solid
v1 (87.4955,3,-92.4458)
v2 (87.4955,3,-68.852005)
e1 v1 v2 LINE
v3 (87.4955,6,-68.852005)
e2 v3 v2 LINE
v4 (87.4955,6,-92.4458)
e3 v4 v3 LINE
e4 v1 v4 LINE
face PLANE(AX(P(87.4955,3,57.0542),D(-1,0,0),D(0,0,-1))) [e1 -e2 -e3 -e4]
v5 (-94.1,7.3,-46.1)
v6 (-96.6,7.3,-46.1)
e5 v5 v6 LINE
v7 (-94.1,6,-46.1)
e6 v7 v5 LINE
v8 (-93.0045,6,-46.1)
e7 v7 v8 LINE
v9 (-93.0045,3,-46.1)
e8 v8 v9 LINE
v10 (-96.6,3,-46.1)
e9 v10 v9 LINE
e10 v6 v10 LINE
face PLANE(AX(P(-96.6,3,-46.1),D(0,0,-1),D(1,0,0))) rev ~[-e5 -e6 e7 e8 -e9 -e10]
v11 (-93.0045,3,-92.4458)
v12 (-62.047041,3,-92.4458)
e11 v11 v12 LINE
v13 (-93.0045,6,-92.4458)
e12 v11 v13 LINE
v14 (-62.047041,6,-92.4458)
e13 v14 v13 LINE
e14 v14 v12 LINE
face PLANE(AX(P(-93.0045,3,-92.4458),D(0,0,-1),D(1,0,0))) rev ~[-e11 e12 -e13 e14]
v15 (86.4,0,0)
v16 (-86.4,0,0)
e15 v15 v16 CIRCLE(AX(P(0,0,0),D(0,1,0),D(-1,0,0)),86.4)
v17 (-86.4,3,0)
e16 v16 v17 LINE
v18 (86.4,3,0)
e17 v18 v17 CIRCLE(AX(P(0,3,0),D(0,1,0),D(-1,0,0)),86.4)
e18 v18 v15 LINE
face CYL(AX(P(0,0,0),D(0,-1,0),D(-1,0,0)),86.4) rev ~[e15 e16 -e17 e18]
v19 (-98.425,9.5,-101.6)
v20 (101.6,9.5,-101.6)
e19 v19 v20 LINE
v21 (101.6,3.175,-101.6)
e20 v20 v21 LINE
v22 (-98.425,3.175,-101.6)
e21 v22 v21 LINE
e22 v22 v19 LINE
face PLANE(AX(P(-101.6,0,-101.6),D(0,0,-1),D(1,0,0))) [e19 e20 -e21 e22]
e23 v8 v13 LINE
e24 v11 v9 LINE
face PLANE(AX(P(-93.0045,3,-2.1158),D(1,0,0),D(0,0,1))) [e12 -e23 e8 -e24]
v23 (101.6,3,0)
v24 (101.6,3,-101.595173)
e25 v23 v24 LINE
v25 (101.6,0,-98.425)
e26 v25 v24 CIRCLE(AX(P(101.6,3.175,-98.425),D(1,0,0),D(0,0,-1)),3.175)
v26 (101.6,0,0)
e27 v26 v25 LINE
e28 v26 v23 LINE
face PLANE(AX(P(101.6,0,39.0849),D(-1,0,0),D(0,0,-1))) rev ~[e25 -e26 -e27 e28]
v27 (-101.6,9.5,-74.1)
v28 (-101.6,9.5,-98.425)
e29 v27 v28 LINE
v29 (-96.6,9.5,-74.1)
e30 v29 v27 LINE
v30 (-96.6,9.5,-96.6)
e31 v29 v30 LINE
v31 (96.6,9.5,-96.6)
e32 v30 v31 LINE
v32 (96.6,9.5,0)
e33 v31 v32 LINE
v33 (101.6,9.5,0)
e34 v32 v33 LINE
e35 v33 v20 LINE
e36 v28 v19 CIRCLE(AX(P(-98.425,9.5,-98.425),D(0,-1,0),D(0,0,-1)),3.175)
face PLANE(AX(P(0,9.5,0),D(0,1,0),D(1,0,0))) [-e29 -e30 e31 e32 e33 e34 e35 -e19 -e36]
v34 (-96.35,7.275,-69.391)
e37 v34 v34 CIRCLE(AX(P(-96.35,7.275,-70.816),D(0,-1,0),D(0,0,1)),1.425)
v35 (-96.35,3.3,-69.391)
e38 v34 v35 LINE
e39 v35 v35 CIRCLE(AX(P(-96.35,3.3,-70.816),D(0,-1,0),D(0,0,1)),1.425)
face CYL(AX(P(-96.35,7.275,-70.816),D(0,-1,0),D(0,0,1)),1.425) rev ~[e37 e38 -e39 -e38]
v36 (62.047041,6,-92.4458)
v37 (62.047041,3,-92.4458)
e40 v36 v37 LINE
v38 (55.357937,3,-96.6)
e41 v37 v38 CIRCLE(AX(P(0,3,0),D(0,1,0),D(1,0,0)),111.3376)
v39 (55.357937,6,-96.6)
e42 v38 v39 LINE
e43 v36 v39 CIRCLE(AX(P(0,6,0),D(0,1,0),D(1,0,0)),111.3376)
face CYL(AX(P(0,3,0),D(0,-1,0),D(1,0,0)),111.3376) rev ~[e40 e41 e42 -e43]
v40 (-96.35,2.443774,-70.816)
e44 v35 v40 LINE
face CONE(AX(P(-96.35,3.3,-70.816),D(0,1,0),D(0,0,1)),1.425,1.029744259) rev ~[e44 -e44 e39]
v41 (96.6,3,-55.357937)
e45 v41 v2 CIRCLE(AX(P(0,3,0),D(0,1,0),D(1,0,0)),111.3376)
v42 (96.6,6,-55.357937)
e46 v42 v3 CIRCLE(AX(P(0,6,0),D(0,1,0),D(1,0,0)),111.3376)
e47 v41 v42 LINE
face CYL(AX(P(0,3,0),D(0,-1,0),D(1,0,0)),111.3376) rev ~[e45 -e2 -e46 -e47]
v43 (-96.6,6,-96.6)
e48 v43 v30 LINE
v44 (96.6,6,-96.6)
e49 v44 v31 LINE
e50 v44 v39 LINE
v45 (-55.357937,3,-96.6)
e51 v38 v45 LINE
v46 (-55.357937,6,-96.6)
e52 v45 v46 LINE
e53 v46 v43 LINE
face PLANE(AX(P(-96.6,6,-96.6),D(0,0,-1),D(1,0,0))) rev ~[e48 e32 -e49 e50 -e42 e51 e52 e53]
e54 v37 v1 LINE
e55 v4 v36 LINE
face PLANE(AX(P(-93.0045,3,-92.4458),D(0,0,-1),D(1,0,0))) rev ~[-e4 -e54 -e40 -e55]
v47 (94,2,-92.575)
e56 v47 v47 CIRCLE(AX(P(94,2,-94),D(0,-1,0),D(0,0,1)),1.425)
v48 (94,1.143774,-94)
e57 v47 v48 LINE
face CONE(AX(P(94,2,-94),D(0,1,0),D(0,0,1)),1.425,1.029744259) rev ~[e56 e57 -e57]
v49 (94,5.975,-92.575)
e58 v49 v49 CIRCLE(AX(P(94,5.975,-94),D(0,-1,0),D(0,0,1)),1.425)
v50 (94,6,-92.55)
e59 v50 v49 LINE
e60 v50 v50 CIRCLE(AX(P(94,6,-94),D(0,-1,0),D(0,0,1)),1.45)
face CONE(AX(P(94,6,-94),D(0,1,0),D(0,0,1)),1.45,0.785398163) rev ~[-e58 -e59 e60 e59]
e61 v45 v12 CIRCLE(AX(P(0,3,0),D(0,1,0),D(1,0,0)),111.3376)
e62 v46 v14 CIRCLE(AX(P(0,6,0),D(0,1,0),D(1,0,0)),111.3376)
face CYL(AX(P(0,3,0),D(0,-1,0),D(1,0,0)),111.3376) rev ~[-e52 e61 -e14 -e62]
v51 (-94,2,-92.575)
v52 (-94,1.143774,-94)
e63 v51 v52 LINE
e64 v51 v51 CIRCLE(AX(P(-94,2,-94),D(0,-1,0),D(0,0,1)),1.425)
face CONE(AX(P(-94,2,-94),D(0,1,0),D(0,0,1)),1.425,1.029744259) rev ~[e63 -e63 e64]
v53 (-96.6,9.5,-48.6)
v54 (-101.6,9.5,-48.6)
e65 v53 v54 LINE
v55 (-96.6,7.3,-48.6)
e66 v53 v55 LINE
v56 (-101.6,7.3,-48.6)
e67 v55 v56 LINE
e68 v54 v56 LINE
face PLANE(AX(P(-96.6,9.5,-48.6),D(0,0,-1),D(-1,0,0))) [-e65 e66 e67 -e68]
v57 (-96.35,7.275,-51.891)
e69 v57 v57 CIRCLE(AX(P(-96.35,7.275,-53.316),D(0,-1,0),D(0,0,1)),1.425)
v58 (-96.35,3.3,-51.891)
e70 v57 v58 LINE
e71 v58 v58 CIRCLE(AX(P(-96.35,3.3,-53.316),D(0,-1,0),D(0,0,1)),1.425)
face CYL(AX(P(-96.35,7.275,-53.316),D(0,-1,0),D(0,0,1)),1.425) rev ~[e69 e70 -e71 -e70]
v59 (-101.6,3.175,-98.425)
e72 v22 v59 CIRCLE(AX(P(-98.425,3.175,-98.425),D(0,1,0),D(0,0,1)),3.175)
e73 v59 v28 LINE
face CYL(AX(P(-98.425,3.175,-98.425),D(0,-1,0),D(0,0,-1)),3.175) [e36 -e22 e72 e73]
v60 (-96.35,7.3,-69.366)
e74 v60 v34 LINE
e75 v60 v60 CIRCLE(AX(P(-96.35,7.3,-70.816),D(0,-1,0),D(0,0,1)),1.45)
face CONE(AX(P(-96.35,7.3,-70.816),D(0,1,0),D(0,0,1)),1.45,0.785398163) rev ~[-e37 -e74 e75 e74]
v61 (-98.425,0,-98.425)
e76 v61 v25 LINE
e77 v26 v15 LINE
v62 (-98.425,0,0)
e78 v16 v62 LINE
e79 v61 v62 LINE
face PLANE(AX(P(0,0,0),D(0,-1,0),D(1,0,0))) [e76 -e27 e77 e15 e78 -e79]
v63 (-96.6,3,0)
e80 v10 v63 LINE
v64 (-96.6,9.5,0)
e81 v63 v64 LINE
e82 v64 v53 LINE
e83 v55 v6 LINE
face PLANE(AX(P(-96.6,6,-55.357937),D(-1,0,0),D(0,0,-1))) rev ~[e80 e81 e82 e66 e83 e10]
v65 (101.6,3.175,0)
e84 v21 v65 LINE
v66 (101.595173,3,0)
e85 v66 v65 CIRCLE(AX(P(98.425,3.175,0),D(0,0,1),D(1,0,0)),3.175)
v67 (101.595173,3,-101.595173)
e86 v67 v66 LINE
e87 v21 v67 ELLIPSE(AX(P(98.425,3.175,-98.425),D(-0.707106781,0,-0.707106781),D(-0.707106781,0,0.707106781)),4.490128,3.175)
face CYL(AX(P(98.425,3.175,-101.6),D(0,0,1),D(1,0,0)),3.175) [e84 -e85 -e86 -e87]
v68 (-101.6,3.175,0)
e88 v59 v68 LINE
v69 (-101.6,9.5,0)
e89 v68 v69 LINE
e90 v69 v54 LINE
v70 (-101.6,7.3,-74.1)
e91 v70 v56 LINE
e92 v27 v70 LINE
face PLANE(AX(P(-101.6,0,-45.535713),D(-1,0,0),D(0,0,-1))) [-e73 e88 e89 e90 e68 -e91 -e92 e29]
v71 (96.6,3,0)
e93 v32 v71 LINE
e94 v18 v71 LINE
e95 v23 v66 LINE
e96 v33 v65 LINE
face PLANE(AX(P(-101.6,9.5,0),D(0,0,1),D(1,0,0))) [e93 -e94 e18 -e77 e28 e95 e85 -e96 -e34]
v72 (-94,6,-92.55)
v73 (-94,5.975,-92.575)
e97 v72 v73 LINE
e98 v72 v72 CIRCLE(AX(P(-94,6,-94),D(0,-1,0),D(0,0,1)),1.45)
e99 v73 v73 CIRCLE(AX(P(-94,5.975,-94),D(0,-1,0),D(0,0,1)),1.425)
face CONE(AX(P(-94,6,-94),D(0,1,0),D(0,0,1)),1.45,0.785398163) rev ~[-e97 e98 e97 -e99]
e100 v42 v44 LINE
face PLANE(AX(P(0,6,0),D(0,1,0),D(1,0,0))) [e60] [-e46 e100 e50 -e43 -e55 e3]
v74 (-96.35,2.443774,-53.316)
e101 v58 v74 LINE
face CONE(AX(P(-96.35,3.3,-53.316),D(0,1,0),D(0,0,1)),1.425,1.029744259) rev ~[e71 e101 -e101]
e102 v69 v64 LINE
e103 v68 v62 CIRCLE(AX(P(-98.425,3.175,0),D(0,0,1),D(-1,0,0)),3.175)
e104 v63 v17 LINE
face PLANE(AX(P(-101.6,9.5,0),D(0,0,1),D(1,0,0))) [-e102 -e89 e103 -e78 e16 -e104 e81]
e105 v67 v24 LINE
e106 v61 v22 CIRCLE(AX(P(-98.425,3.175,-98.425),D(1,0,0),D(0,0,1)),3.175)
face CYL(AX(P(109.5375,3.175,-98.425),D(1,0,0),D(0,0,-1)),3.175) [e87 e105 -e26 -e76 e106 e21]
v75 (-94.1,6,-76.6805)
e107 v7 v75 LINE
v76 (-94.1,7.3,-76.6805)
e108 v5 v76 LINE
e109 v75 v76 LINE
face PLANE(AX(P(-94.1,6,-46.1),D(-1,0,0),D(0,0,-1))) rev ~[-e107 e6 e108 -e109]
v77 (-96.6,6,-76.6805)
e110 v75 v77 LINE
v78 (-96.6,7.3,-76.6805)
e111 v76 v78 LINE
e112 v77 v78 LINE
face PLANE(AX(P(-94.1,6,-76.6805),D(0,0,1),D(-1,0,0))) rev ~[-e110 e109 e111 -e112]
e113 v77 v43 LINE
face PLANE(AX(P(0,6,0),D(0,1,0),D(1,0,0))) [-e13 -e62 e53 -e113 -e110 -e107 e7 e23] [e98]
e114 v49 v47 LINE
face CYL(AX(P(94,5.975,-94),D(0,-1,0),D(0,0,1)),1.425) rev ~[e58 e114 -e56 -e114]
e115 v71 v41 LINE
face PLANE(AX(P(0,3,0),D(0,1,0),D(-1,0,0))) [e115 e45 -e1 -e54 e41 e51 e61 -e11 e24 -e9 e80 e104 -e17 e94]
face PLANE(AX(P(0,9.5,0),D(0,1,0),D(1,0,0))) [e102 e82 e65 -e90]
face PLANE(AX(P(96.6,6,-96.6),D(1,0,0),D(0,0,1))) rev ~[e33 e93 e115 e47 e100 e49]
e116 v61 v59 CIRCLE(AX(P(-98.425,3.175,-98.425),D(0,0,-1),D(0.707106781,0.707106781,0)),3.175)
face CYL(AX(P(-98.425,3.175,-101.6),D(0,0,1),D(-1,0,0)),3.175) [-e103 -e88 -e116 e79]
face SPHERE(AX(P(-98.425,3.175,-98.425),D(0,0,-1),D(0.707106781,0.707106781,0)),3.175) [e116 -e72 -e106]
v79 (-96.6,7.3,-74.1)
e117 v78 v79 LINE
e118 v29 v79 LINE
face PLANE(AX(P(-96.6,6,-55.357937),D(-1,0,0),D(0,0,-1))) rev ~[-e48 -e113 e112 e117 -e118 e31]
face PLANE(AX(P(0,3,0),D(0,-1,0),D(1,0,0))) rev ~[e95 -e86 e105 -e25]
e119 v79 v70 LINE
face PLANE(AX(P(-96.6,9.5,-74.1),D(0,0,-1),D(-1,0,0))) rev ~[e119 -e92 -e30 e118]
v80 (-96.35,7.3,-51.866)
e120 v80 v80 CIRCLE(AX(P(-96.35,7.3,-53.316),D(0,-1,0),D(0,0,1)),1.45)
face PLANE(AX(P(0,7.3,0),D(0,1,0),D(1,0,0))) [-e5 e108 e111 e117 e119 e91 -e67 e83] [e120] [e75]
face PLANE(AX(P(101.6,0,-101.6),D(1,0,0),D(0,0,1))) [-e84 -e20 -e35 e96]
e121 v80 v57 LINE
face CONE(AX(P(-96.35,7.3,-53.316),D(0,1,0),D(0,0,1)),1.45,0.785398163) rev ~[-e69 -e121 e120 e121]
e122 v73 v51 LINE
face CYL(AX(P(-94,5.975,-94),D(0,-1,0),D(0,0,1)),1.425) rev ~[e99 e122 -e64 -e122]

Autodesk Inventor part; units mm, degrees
ref_plane "YZ Plane" through (0, 0, 0) normal (1, 0, 0) x (0, 1, 0)
ref_plane "XZ Plane" through (0, 0, 0) normal (0, 1, 0) x (-1, 0, 0)
ref_plane "XY Plane" through (0, 0, 0) normal (0, 0, 1) x (1, 0, 0)
sketch "Sketch1" plane through (0, 0, 0) normal (0, 1, 0) x (-1, 0, 0)
  line L0 (101.6, -101.6) -> (-101.6, -101.6)
  line L1 (-101.6, -101.6) -> (-101.6, 101.6)
  line L2 (-101.6, 101.6) -> (101.6, 101.6)
  line L3 (101.6, 101.6) -> (101.6, -101.6)
  line L4 (96.6, -96.6) -> (-96.6, -96.6)
  line L5 (-96.6, -96.6) -> (-96.6, 96.6)
  line L6 (-96.6, 96.6) -> (96.6, 96.6)
  line L7 (96.6, 96.6) -> (96.6, -96.6)
  line L8 (101.6, 101.6) -> (-40.4, 101.6)
  circle A0 centre (0, 0) radius 86.4
  circle A1 centre (0, 0) radius 109.3376
  line L9 (-40.4, 101.6) -> (-101.6, 40.4)
  line L10 (-45.4, 101.6) -> (-101.6, 45.4)
  line L11 (96.6, 96.6) -> (96.6, 101.6)
  line L12 (-45.4, 101.6) -> (-35.4, 101.6)
  line L13 (-35.4, 101.6) -> (-35.4, 96.6)
  line L14 (-35.4, 96.6) -> (-45.4, 96.6)
  line L15 (-45.4, 96.6) -> (-45.4, 101.6)
  circle A2 centre (0, 0) radius 111.3376
  point P0 (96.6, 51.2168)
  point P1 (101.6, 40.4)
  point P2 (101.6, -40.4)
  point P3 (96.6, -51.2168)
  point P4 (-96.6, 45.4)
  point P5 (-45.4, 96.6)
  dimension "d0" = 203.2
  dimension "d1" = 203.2
  dimension "d2" = 101.6
  dimension "d3" = 101.6
  dimension "d4" = 5
  dimension "d5" = 5
  dimension "d6" = 5
  dimension "d7" = 5
  dimension "d10" = 142
  dimension "d12" = 61.2
  dimension "d14" = 172.8
  dimension "d15" = 5
  dimension "d16" = 5
  dimension "d17" = 10
  dimension "d34" = 2
extrude "Extrusion1" add sketch "Sketch1" along normal blind 3 contours L0 A2 L4 L7 L3 | L0 A1 L4 A2 | A2 L7 A1 L3 | L0 A1 L4 | A2 L4 A1 L0 | L0 L1 A2 L5 L4 | A2 L7 L4 | L4 A1 L7 A2 | A1 L7 L3 | L4 A1 L5 L9 L6 L7 | A2 L5 A1 L4 | L4 L5 A2 | A1 L7 A2 L3 | A2 L7 L11 L2 L3 | L1 A1 L5 A2 | A1 L6 A2 L7 | A2 L6 L7 | A1 L1 L9 L5 | A1 L2 A2 L6 | L6 L13 L2 A1 | L11 L6 A2 L2 | L9 A1 L10 L5 | L5 L10 L6 L9 | L1 L10 A1 | L6 L9 L2 L13 | L15 A1 L9 | L6 L10 A1 L15 | A1 L15 L2 | A1 L10 L15
sketch "Sketch5" plane through (0, 3, 0) normal (0, 1, 0) x (1, 0, 0)
  line L0 (-101.6, 101.6) -> (101.6, 101.6)
  line L1 (101.6, 101.6) -> (101.6, -101.6)
  line L2 (101.6, -101.6) -> (-101.6, -101.6)
  line L3 (-101.6, -101.6) -> (-101.6, 101.6)
  line L4 (-96.6, 96.6) -> (96.6, 96.6)
  line L5 (96.6, 96.6) -> (96.6, -96.6)
  line L6 (96.6, -96.6) -> (-96.6, -96.6)
  line L7 (-96.6, -96.6) -> (-96.6, 96.6)
  line L8 (-101.6, -101.6) -> (40.4, -101.6)
  circle A0 centre (0, 0) radius 88.9
  circle A1 centre (0, 0) radius 109.3376
  line L9 (40.4, -101.6) -> (101.6, -40.4)
  line L10 (45.4, -101.6) -> (101.6, -45.4)
  line L11 (-96.6, -96.6) -> (-96.6, -101.6)
  line L12 (45.4, -101.6) -> (35.4, -101.6)
  line L13 (35.4, -101.6) -> (35.4, -96.6)
  line L14 (35.4, -96.6) -> (45.4, -96.6)
  line L15 (45.4, -96.6) -> (45.4, -101.6)
  circle A2 centre (0, 0) radius 111.3376
  point P0 (96.6, 101.6)
  point P1 (96.6, 51.2168)
  point P2 (101.6, 40.4)
  point P3 (101.6, -40.4)
  point P4 (96.6, -51.2168)
  point P5 (-96.6, 45.4)
  point P6 (-45.4, 96.6)
  point P7 (-35.4, 101.6)
  point P8 (-55.358, -96.6)
  point P9 (-96.6, -55.358)
  point P10 (-96.6, 55.358)
  point P11 (-55.358, 96.6)
  point P12 (55.358, 96.6)
  point P13 (96.6, 55.358)
  point P14 (96.6, -45.4)
  point P15 (45.4, -96.6)
  dimension "d37" = 203.2
  dimension "d38" = 203.2
  dimension "d39" = 101.6
  dimension "d40" = 101.6
  dimension "d41" = 5
  dimension "d42" = 5
  dimension "d43" = 5
  dimension "d44" = 5
  dimension "d45" = 142
  dimension "d46" = 61.2
  dimension "d47" = 177.8
  dimension "d48" = 5
  dimension "d49" = 5
  dimension "d50" = 10
  dimension "d51" = 2
extrude "Extrusion4" add sketch "Sketch5" along normal blind 3 contours L0 A2 L4 L7 L3 | L0 A1 L4 A2 | A2 L7 A1 L3 | L0 A1 L4 | A2 L4 A1 L0 | L0 L1 A2 L5 L4 | A2 L7 L4 | A1 L7 L3 | A2 L7 L11 L2 L3 | L3 A1 L7 A2 | L4 L5 A2 | A2 L6 L7 | L1 A1 L5 A2 | L11 L6 A2 L2 | L6 A1 L2 A2 | A1 L1 L9 L5 | L6 L13 L2 A1 | L9 A1 L10 L5 | L5 L10 L6 L9 | L1 L10 A1 | L6 L9 L2 L13 | L15 A1 L9 | L6 L10 A1 L15 | A1 L15 L2 | L15 A1 L10
sketch "Sketch6" plane through (0, 6, 0) normal (0, 1, 0) x (1, 0, 0)
  line L0 (-101.6, 101.6) -> (101.6, 101.6)
  line L1 (101.6, 101.6) -> (101.6, -101.6)
  line L2 (101.6, -101.6) -> (-101.6, -101.6)
  line L3 (-101.6, -101.6) -> (-101.6, 101.6)
  line L4 (-96.6, 96.6) -> (96.6, 96.6)
  line L5 (96.6, 96.6) -> (96.6, -96.6)
  line L6 (96.6, -96.6) -> (-96.6, -96.6)
  line L7 (-96.6, -96.6) -> (-96.6, 96.6)
  line L8 (-101.6, -101.6) -> (40.4, -101.6)
  circle A0 centre (0, 0) radius 88.9
  circle A1 centre (0, 0) radius 109.3376
  line L9 (40.4, -101.6) -> (101.6, -40.4)
  line L10 (45.4, -101.6) -> (101.6, -45.4)
  line L11 (-96.6, -96.6) -> (-96.6, -101.6)
  line L12 (45.4, -101.6) -> (35.4, -101.6)
  line L13 (35.4, -101.6) -> (35.4, -96.6)
  line L14 (35.4, -96.6) -> (45.4, -96.6)
  line L15 (45.4, -96.6) -> (45.4, -101.6)
  circle A2 centre (0, 0) radius 111.3376
  point P0 (96.6, 101.6)
  point P1 (96.6, 51.2168)
  point P2 (101.6, 40.4)
  point P3 (101.6, -40.4)
  point P4 (96.6, -51.2168)
  point P5 (-96.6, 45.4)
  point P6 (-45.4, 96.6)
  point P7 (-35.4, 101.6)
  point P8 (55.358, 96.6)
  point P9 (96.6, 55.358)
  point P10 (96.6, -45.4)
  point P11 (45.4, -96.6)
  dimension "d84" = 1
  dimension "d85" = 5.25
  dimension "d86" = 8.75
  dimension "d87" = 8.75
  dimension "d88" = 2
  dimension "d89" = 2
  dimension "d54" = 203.2
  dimension "d55" = 203.2
  dimension "d56" = 101.6
  dimension "d57" = 101.6
  dimension "d58" = 5
  dimension "d59" = 5
  dimension "d60" = 5
  dimension "d61" = 5
  dimension "d62" = 142
  dimension "d63" = 61.2
  dimension "d64" = 177.8
  dimension "d65" = 5
  dimension "d66" = 5
  dimension "d67" = 10
  dimension "d68" = 2
extrude "Extrusion5" add sketch "Sketch6" along normal blind 3.5 contours L0 A2 L4 L7 L3 | L0 A1 L4 A2 | A2 L7 A1 L3 | L0 A1 L4 | A2 L4 A1 L0 | L0 L1 A2 L5 L4 | A1 L7 L3 | A2 L7 L11 L2 L3 | L3 A1 L7 A2 | L1 A1 L5 A2 | L11 L6 A2 L2 | L6 A1 L2 A2 | A1 L1 L9 L5 | L6 L13 L2 A1 | L9 A1 L10 L5 | L5 L10 L6 L9 | L1 L10 A1 | L6 L9 L2 L13 | L15 A1 L9 | L6 L10 A1 L15 | A1 L15 L2 | L15 A1 L10
fillet "Fillet6" radius 3.175 5 edges at (-28.1, 0, 101.6) (73.5, 0, 73.5) (101.6, 0, -28.1) (0, 0, -101.6) (-101.6, 0, 0)
sketch "Sketch7" plane through (0, 0, 0) normal (0, -1, 0) x (1, 0, 0)
  line L0 (101.6, 45.4) -> (101.6, -101.6) projected
  line L1 (98.425, 44.0849) -> (98.425, -98.425) projected
  line L2 (101.6, -101.6) -> (98.425, -101.6)
  line L3 (98.425, -101.6) -> (98.425, 39.0849)
  line L4 (98.425, 39.0849) -> (101.6, 39.0849)
  line L5 (101.6, 39.0849) -> (101.6, -101.6)
  line L6 (44.0849, 98.425) -> (98.425, 44.0849) projected
  line L7 (98.425, 44.0849) -> (101.6, 44.0849)
  point P0 (0, 0)
  dimension "d73" = 5
extrude "Extrusion6" add sketch "Sketch7" against normal blind 3 contours L0 L2 L3 L1 L4
fillet "Fillet7" radius 3.175 1 edges at (100.0125, 0, -101.6)
fillet "Fillet8" radius 3.175 4 edges at (-100.6701, 0.9299, 100.6701) (-101.6, 6.3375, 101.6) (-100.6701, 0.9299, -100.6701) (-101.6, 6.3375, -101.6)
fillet "Fillet9" radius 3.175 4 edges at (100.6701, 0.9299, 45.0148) (101.6, 6.3375, 45.4) (45.0148, 0.9299, 100.6701) (45.4, 6.3375, 101.6)
sketch "Sketch11" plane through (0, 3, 0) normal (0, 1, 0) x (1, 0, 0)
  arc A0 (-101.6, -98.425) -> (-98.425, -101.6) centre (-98.425, -98.425) ccw
  line L0 (44.0849, 101.6) -> (-98.425, 101.6)
  line L1 (-101.6, 98.425) -> (-101.6, -98.425)
  line L2 (-101.6, -46.1) -> (-101.6, -76.6)
  line L3 (-96.6, -96.6) -> (-96.6, 96.6)
  line L4 (-96.6, -46.1) -> (-96.6, -76.6)
  line L5 (-101.6, -76.6) -> (-96.6, -76.6)
  line L6 (-101.6, -46.1) -> (-96.6, -46.1)
  line L7 (-98.425, -101.6) -> (101.6, -101.6)
  line L8 (0, 0) -> (-101.6, 0)
  line L9 (-101.6, 46.1) -> (-101.6, 76.6)
  line L10 (-96.6, 46.1) -> (-96.6, 76.6)
  line L11 (-101.6, 76.6) -> (-96.6, 76.6)
  line L12 (-101.6, 46.1) -> (-96.6, 46.1)
  line L13 (-96.6, -76.6) -> (-90.1, -76.6)
  line L14 (-90.1, -76.6) -> (-90.1, -46.1)
  line L15 (-90.1, -46.1) -> (-96.6, -46.1)
  line L16 (-96.6, -46.1) -> (-96.6, -76.6)
  line L17 (-96.6, 46.1) -> (-90.1, 46.1)
  line L18 (-90.1, 46.1) -> (-90.1, 76.6)
  line L19 (-90.1, 76.6) -> (-96.6, 76.6)
  line L20 (-96.6, 76.6) -> (-96.6, 46.1)
  point P0 (-98.425, 98.425)
  point P1 (46.1, 101.6)
  point P2 (46.1, 96.6)
  point P3 (76.6, 96.6)
  point P4 (76.6, 101.6)
  point P5 (-46.1, 96.6)
  point P6 (-96.6, -46.1)
  point P7 (-101.6, 46.1)
  point P8 (-96.6, 46.1)
  point P9 (-96.6, 76.6)
  point P10 (-101.6, 76.6)
  point P11 (-96.6, 76.6)
  dimension "d97" = 30.5
  dimension "d98" = 25
  dimension "d99" = 5
  dimension "d100" = 6.5
  dimension "d101" = 6.5
extrude "Extrusion8" add sketch "Sketch11" along normal up to surface (3 mm away) contours L19 L18 L17 L3 | L15 L14 L13 L3
sketch "Sketch8" plane through (0, 9.5, 0) normal (0, 1, 0) x (1, 0, 0)
  arc A0 (-101.6, -98.425) -> (-98.425, -101.6) centre (-98.425, -98.425) ccw
  line L0 (44.0849, 101.6) -> (-98.425, 101.6)
  line L1 (-101.6, 98.425) -> (-101.6, -98.425)
  line L2 (-101.6, -46.1) -> (-101.6, -76.6)
  line L3 (-96.6, -96.6) -> (-96.6, 96.6)
  line L4 (-96.6, -46.1) -> (-96.6, -76.6)
  line L5 (-101.6, -76.6) -> (-96.6, -76.6)
  line L6 (-101.6, -46.1) -> (-96.6, -46.1)
  line L7 (-98.425, -101.6) -> (101.6, -101.6)
  line L8 (0, 0) -> (-101.6, 0)
  line L9 (-101.6, 46.1) -> (-101.6, 76.6)
  line L10 (-96.6, 46.1) -> (-96.6, 76.6)
  line L11 (-101.6, 76.6) -> (-96.6, 76.6)
  line L12 (-101.6, 46.1) -> (-96.6, 46.1)
  line L13 (-96.6, -76.6) -> (-90.1, -76.6)
  line L14 (-90.1, -76.6) -> (-90.1, -46.1)
  line L15 (-90.1, -46.1) -> (-96.6, -46.1)
  line L16 (-96.6, -46.1) -> (-96.6, -76.6)
  line L17 (-96.6, 46.1) -> (-90.1, 46.1)
  line L18 (-90.1, 46.1) -> (-90.1, 76.6)
  line L19 (-90.1, 76.6) -> (-96.6, 76.6)
  line L20 (-96.6, 76.6) -> (-96.6, 46.1)
  line L21 (-96.6, -76.6) -> (-101.6, -76.6)
  line L22 (-101.6, -76.6) -> (-101.6, -74.1)
  line L23 (-101.6, -74.1) -> (-96.6, -74.1)
  line L24 (-96.6, -74.1) -> (-96.6, -76.6)
  line L25 (-96.6, -96.6) -> (-96.6, 96.6) projected
  line L26 (-101.6, -46.1) -> (-96.6, -46.1)
  line L27 (-96.6, -46.1) -> (-96.6, -48.6)
  line L28 (-96.6, -48.6) -> (-101.6, -48.6)
  line L29 (-101.6, -48.6) -> (-101.6, -46.1)
  line L30 (-101.6, 76.6) -> (-96.6, 76.6)
  line L31 (-96.6, 76.6) -> (-96.6, 74.1)
  line L32 (-96.6, 74.1) -> (-101.6, 74.1)
  line L33 (-101.6, 74.1) -> (-101.6, 76.6)
  line L34 (-101.6, 46.1) -> (-96.6, 46.1)
  line L35 (-96.6, 46.1) -> (-96.6, 48.6)
  line L36 (-96.6, 48.6) -> (-101.6, 48.6)
  line L37 (-101.6, 48.6) -> (-101.6, 46.1)
  point P0 (-98.425, 98.425)
  point P1 (46.1, 101.6)
  point P2 (46.1, 96.6)
  point P3 (76.6, 96.6)
  point P4 (76.6, 101.6)
  point P5 (-46.1, 96.6)
  point P6 (-96.6, -46.1)
  point P7 (-101.6, 46.1)
  point P8 (-96.6, 46.1)
  point P9 (-96.6, 76.6)
  point P10 (-101.6, 76.6)
  point P11 (-96.6, 76.6)
  dimension "d77" = 30.5
  dimension "d78" = 25
  dimension "d79" = 5
  dimension "d82" = 6.5
  dimension "d83" = 6.5
  dimension "d169" = 2.5
  dimension "d170" = 2.5
  dimension "d171" = 2.5
  dimension "d172" = 2.5
extrude "Extrusion7" cut sketch "Sketch8" against normal blind 2.2 contours L32 L3 L36 L1 | L28 L3 L23 L1
sketch "Sketch15" plane through (0, 3, 0) normal (0, 1, 0) x (1, 0, 0)
  line L0 (0.1655, 2.1158) -> (-93.0045, 2.1158)
  line L1 (-93.0045, 2.1158) -> (-93.0045, 92.4458)
  line L2 (-93.0045, 92.4458) -> (0.1655, 92.4458)
  line L3 (0.1655, 92.4458) -> (0.1655, 2.1158)
  line L4 (0.1655, 2.1158) -> (-93.0045, 2.1158)
  line L5 (-93.0045, 2.1158) -> (-93.0045, -88.0542)
  line L6 (-93.0045, -88.0542) -> (0.1655, -88.0542)
  line L7 (0.1655, -88.0542) -> (0.1655, 2.1158)
  line L8 (0.1655, -88.0542) -> (87.4955, -88.0542)
  line L9 (87.4955, -88.0542) -> (87.4955, -6.1383)
  line L10 (87.4955, -6.1383) -> (0.1655, -6.1383)
  line L11 (0.1655, -6.1383) -> (0.1655, -88.0542)
  line L12 (87.4955, -6.1383) -> (0.1655, -6.1383)
  line L13 (0.1655, -6.1383) -> (0.1655, 92.4458)
  line L14 (0.1655, 92.4458) -> (87.4955, 92.4458)
  line L15 (87.4955, 92.4458) -> (87.4955, -6.1383)
  line L16 (56.4955, -88.0542) -> (87.4955, -57.0542)
  line L17 (56.4955, -88.0542) -> (100.3361, -88.0542) construction
  point P0 (-90.1, -65.4069)
  dimension "d143" = 93.17
  dimension "d144" = 90.17
  dimension "d147" = 180.5
  dimension "d148" = 45
  dimension "d149" = 149.5
  dimension "d150" = 149.5
  dimension "d151" = 93.17
  dimension "d152" = 98.5841
  dimension "d153" = 180.5
extrude "Extrusion9" cut sketch "Sketch15" along normal blind 4 contours L7 L6 L5 L0 | L0 L1 L2 L3 | L3 L14 L15 L10 L7 | L10 L9 L16 L8 L7
sketch "Sketch16" plane through (0, 9.5, 0) normal (0, 1, 0) x (1, 0, 0)
  line L0 (-92.6321, 91.7869) -> (87.7079, 91.7869)
  line L1 (87.7079, 91.7869) -> (87.7079, -88.5531)
  line L2 (87.7079, -88.5531) -> (-92.6321, -88.5531)
  line L3 (-92.6321, -88.5531) -> (-92.6321, 91.7869)
  line L4 (56.3679, -88.5531) -> (87.7079, -57.2131)
  line L5 (56.3679, -88.5531) -> (100.6893, -88.5531) construction
  dimension "d154" = 180.34
  dimension "d155" = 180.34
  dimension "d156" = 45
  dimension "d157" = 149
  dimension "d158" = 149
  dimension "d159" = 22.1607
sketch "Sketch17" plane through (0, 3, 0) normal (0, 1, 0) x (1, 0, 0)
  line L0 (96.6, -45.4) -> (45.4, -96.6) projected
  line L1 (45.4, -96.6) -> (45.4, -91.6)
  line L2 (56.4955, -88.0542) -> (87.4955, -57.0542) projected
  line L3 (56.4955, -88.0542) -> (52.9497, -91.6)
  line L4 (44.0849, -98.425) -> (98.425, -44.0849) projected
  line L5 (52.9497, -91.6) -> (45.4, -91.6)
  line L6 (87.4955, -57.0542) -> (91.6, -52.9497)
  line L7 (91.6, -52.9497) -> (91.6, -45.4)
  line L8 (91.6, -45.4) -> (96.6, -45.4)
  point P0 (0, 0)
  point P1 (91.6, -50.4)
  point P2 (50.4, -91.6)
  dimension "d160" = 5
  dimension "d161" = 5
extrude "Extrusion10" cut sketch "Sketch17" along normal blind 4 contours L7 L4 L5 L0 | L7 L6 L2 L3 L5 L4
sketch "Sketch19" plane through (0, 6, 0) normal (0, 1, 0) x (1, 0, 0)
  line L0 (-93.0045, 46.1) -> (-96.6, 46.1) projected
  line L1 (-96.6, 46.1) -> (-94.1, 46.1)
  line L2 (-94.1, 46.1) -> (-94.1, 76.6805)
  line L3 (-94.1, 76.6805) -> (-96.6, 76.6805)
  line L4 (-96.6, 76.6805) -> (-96.6, 46.1)
  line L5 (-101.6, -46.1) -> (-96.6, -46.1) projected
  line L6 (-96.6, -46.1) -> (-94.1, -46.1)
  line L7 (-94.1, -46.1) -> (-94.1, -76.6)
  line L8 (-94.1, -76.6) -> (-96.6, -76.6)
  line L9 (-96.6, -76.6) -> (-96.6, -46.1)
  point P0 (0, 0)
  dimension "d165" = 2.5
  dimension "d168" = 2.5
extrude "Extrusion11" add sketch "Sketch19" along normal up to surface (1.3 mm away)
sketch "Sketch12" plane through (0, 6, 0) normal (0, 1, 0) x (1, 0, 0)
  line L0 (-94, 94) -> (94, 94)
  line L1 (94, 94) -> (94, -94)
  line L2 (94, -94) -> (-94, -94)
  line L3 (-94, -94) -> (-94, 94)
  circle A0 centre (-94, 94) radius 1
  circle A1 centre (94, 94) radius 1
  circle A2 centre (-94, -94) radius 1
  circle A3 centre (94, -39.0849) radius 1.5
  point P0 (0, 0)
  dimension "d104" = 94
  dimension "d105" = 94
  dimension "d106" = 94
  dimension "d107" = 94
  dimension "d108" = 2
  dimension "d109" = 2
  dimension "d110" = 2
  dimension "d164" = 3
hole "Assembly Holes" at (-94, 6, 94) at (-94, 6, -94) at (94, 6, -94) at (94, 6, 39.0849) direction (0, -1, 0) diameter 2.85 depth 4 tip angle 118 countersink diameter 2.9 countersink angle 90 thread size "M3.5x0.6" class "6H" standard "ANSI Metric M Profile"
sketch "Sketch10" plane through (0, 7.3, 0) normal (0, 1, 0) x (1, 0, 0)
  line L0 (-90.1, -76.6) -> (-90.1, -46.1)
  line L1 (-101.6, -46.1) -> (-96.6, -46.1)
  line L2 (-90.1, -76.6) -> (-90.1, -46.1)
  line L3 (-90.1, -46.1) -> (-101.6, -46.1)
  line L4 (-101.6, -46.1) -> (-101.6, -76.6)
  line L5 (-101.6, -76.6) -> (-90.1, -76.6)
  line L6 (-96.6, -76.6) -> (-90.1, -76.6)
  line L7 (-91.1, -76.6) -> (-91.1, -46.1)
  line L8 (-91.1, -62.066) -> (-96.35, -62.066)
  line L9 (-96.35, -62.066) -> (-96.35, -70.816)
  line L10 (-96.35, -62.066) -> (-96.35, -53.316)
  circle A0 centre (-96.35, -53.316) radius 1
  circle A1 centre (-96.35, -70.816) radius 1
  line L11 (0, 0) -> (-101.6, 0)
  line L12 (-101.6, 98.425) -> (-101.6, -98.425)
  circle A2 centre (-96.35, 70.816) radius 1
  line L13 (-96.35, 62.066) -> (-96.35, 70.816)
  line L14 (-91.1, 62.066) -> (-96.35, 62.066)
  line L15 (-101.6, 76.6) -> (-90.1, 76.6)
  line L16 (-96.35, 62.066) -> (-96.35, 53.316)
  circle A3 centre (-96.35, 53.316) radius 1
  line L17 (-101.6, 46.1) -> (-96.6, 46.1)
  line L18 (-90.1, 46.1) -> (-101.6, 46.1)
  line L19 (-91.1, 76.6) -> (-91.1, 46.1)
  line L20 (-101.6, 46.1) -> (-101.6, 76.6)
  line L21 (-90.1, 76.6) -> (-90.1, 46.1)
  line L22 (-90.1, 76.6) -> (-90.1, 46.1)
  line L23 (-96.6, 76.6) -> (-90.1, 76.6)
  dimension "d84" = 1
  dimension "d85" = 5.25
  dimension "d86" = 8.75
  dimension "d87" = 8.75
  dimension "d88" = 2
  dimension "d89" = 2
hole "Hinge Holes" at (-96.35, 7.3, -70.816) at (-96.35, 7.3, -53.316) at (-96.35, 7.3, 70.816) at (-96.35, 7.3, 53.316) direction (0, -1, 0) diameter 2.85 depth 4 tip angle 118 countersink diameter 2.9 countersink angle 90 thread size "M3.5x0.6" class "6H" standard "ANSI Metric M Profile"
sketch "Sketch21" plane through (0, 9.5, 0) normal (0, 1, 0) x (1, 0, 0)
  line L0 (-101.6, 48.6) -> (-101.6, -48.6) projected
  line L1 (-101.6, 0) -> (101.6, 0)
  line L2 (101.6, 101.6) -> (101.6, -44.0849) projected
  point P0 (0, 0)
ref_plane "Work Plane1" through (-101.6, 9.5, 0) normal (0, 0, 1) x (1, 0, 0)
sketch "Sketch22" plane through (-101.6, 9.5, 0) normal (0, 0, 1) x (1, 0, 0)
  line L0 (-24.2015, 33.7175) -> (229.9688, 33.7175)
  line L1 (229.9688, 33.7175) -> (229.9688, -38.169)
  line L2 (229.9688, -38.169) -> (-24.2015, -38.169)
  line L3 (-24.2015, -38.169) -> (-24.2015, 33.7175)
  point P0 (101.6, -9.5)
extrude "Extrusion12" cut sketch "Sketch22" along normal through all
equation "\"d1\" = d0"
equation "\"d2\" = 0.5 * d0"
equation "\"d3\" = 0.5 * d0"
equation "\"d38\" = d37"
equation "\"d39\" = 0.5 * d37"
equation "\"d40\" = 0.5 * d37"
properties part number "Box_Walls_2"
